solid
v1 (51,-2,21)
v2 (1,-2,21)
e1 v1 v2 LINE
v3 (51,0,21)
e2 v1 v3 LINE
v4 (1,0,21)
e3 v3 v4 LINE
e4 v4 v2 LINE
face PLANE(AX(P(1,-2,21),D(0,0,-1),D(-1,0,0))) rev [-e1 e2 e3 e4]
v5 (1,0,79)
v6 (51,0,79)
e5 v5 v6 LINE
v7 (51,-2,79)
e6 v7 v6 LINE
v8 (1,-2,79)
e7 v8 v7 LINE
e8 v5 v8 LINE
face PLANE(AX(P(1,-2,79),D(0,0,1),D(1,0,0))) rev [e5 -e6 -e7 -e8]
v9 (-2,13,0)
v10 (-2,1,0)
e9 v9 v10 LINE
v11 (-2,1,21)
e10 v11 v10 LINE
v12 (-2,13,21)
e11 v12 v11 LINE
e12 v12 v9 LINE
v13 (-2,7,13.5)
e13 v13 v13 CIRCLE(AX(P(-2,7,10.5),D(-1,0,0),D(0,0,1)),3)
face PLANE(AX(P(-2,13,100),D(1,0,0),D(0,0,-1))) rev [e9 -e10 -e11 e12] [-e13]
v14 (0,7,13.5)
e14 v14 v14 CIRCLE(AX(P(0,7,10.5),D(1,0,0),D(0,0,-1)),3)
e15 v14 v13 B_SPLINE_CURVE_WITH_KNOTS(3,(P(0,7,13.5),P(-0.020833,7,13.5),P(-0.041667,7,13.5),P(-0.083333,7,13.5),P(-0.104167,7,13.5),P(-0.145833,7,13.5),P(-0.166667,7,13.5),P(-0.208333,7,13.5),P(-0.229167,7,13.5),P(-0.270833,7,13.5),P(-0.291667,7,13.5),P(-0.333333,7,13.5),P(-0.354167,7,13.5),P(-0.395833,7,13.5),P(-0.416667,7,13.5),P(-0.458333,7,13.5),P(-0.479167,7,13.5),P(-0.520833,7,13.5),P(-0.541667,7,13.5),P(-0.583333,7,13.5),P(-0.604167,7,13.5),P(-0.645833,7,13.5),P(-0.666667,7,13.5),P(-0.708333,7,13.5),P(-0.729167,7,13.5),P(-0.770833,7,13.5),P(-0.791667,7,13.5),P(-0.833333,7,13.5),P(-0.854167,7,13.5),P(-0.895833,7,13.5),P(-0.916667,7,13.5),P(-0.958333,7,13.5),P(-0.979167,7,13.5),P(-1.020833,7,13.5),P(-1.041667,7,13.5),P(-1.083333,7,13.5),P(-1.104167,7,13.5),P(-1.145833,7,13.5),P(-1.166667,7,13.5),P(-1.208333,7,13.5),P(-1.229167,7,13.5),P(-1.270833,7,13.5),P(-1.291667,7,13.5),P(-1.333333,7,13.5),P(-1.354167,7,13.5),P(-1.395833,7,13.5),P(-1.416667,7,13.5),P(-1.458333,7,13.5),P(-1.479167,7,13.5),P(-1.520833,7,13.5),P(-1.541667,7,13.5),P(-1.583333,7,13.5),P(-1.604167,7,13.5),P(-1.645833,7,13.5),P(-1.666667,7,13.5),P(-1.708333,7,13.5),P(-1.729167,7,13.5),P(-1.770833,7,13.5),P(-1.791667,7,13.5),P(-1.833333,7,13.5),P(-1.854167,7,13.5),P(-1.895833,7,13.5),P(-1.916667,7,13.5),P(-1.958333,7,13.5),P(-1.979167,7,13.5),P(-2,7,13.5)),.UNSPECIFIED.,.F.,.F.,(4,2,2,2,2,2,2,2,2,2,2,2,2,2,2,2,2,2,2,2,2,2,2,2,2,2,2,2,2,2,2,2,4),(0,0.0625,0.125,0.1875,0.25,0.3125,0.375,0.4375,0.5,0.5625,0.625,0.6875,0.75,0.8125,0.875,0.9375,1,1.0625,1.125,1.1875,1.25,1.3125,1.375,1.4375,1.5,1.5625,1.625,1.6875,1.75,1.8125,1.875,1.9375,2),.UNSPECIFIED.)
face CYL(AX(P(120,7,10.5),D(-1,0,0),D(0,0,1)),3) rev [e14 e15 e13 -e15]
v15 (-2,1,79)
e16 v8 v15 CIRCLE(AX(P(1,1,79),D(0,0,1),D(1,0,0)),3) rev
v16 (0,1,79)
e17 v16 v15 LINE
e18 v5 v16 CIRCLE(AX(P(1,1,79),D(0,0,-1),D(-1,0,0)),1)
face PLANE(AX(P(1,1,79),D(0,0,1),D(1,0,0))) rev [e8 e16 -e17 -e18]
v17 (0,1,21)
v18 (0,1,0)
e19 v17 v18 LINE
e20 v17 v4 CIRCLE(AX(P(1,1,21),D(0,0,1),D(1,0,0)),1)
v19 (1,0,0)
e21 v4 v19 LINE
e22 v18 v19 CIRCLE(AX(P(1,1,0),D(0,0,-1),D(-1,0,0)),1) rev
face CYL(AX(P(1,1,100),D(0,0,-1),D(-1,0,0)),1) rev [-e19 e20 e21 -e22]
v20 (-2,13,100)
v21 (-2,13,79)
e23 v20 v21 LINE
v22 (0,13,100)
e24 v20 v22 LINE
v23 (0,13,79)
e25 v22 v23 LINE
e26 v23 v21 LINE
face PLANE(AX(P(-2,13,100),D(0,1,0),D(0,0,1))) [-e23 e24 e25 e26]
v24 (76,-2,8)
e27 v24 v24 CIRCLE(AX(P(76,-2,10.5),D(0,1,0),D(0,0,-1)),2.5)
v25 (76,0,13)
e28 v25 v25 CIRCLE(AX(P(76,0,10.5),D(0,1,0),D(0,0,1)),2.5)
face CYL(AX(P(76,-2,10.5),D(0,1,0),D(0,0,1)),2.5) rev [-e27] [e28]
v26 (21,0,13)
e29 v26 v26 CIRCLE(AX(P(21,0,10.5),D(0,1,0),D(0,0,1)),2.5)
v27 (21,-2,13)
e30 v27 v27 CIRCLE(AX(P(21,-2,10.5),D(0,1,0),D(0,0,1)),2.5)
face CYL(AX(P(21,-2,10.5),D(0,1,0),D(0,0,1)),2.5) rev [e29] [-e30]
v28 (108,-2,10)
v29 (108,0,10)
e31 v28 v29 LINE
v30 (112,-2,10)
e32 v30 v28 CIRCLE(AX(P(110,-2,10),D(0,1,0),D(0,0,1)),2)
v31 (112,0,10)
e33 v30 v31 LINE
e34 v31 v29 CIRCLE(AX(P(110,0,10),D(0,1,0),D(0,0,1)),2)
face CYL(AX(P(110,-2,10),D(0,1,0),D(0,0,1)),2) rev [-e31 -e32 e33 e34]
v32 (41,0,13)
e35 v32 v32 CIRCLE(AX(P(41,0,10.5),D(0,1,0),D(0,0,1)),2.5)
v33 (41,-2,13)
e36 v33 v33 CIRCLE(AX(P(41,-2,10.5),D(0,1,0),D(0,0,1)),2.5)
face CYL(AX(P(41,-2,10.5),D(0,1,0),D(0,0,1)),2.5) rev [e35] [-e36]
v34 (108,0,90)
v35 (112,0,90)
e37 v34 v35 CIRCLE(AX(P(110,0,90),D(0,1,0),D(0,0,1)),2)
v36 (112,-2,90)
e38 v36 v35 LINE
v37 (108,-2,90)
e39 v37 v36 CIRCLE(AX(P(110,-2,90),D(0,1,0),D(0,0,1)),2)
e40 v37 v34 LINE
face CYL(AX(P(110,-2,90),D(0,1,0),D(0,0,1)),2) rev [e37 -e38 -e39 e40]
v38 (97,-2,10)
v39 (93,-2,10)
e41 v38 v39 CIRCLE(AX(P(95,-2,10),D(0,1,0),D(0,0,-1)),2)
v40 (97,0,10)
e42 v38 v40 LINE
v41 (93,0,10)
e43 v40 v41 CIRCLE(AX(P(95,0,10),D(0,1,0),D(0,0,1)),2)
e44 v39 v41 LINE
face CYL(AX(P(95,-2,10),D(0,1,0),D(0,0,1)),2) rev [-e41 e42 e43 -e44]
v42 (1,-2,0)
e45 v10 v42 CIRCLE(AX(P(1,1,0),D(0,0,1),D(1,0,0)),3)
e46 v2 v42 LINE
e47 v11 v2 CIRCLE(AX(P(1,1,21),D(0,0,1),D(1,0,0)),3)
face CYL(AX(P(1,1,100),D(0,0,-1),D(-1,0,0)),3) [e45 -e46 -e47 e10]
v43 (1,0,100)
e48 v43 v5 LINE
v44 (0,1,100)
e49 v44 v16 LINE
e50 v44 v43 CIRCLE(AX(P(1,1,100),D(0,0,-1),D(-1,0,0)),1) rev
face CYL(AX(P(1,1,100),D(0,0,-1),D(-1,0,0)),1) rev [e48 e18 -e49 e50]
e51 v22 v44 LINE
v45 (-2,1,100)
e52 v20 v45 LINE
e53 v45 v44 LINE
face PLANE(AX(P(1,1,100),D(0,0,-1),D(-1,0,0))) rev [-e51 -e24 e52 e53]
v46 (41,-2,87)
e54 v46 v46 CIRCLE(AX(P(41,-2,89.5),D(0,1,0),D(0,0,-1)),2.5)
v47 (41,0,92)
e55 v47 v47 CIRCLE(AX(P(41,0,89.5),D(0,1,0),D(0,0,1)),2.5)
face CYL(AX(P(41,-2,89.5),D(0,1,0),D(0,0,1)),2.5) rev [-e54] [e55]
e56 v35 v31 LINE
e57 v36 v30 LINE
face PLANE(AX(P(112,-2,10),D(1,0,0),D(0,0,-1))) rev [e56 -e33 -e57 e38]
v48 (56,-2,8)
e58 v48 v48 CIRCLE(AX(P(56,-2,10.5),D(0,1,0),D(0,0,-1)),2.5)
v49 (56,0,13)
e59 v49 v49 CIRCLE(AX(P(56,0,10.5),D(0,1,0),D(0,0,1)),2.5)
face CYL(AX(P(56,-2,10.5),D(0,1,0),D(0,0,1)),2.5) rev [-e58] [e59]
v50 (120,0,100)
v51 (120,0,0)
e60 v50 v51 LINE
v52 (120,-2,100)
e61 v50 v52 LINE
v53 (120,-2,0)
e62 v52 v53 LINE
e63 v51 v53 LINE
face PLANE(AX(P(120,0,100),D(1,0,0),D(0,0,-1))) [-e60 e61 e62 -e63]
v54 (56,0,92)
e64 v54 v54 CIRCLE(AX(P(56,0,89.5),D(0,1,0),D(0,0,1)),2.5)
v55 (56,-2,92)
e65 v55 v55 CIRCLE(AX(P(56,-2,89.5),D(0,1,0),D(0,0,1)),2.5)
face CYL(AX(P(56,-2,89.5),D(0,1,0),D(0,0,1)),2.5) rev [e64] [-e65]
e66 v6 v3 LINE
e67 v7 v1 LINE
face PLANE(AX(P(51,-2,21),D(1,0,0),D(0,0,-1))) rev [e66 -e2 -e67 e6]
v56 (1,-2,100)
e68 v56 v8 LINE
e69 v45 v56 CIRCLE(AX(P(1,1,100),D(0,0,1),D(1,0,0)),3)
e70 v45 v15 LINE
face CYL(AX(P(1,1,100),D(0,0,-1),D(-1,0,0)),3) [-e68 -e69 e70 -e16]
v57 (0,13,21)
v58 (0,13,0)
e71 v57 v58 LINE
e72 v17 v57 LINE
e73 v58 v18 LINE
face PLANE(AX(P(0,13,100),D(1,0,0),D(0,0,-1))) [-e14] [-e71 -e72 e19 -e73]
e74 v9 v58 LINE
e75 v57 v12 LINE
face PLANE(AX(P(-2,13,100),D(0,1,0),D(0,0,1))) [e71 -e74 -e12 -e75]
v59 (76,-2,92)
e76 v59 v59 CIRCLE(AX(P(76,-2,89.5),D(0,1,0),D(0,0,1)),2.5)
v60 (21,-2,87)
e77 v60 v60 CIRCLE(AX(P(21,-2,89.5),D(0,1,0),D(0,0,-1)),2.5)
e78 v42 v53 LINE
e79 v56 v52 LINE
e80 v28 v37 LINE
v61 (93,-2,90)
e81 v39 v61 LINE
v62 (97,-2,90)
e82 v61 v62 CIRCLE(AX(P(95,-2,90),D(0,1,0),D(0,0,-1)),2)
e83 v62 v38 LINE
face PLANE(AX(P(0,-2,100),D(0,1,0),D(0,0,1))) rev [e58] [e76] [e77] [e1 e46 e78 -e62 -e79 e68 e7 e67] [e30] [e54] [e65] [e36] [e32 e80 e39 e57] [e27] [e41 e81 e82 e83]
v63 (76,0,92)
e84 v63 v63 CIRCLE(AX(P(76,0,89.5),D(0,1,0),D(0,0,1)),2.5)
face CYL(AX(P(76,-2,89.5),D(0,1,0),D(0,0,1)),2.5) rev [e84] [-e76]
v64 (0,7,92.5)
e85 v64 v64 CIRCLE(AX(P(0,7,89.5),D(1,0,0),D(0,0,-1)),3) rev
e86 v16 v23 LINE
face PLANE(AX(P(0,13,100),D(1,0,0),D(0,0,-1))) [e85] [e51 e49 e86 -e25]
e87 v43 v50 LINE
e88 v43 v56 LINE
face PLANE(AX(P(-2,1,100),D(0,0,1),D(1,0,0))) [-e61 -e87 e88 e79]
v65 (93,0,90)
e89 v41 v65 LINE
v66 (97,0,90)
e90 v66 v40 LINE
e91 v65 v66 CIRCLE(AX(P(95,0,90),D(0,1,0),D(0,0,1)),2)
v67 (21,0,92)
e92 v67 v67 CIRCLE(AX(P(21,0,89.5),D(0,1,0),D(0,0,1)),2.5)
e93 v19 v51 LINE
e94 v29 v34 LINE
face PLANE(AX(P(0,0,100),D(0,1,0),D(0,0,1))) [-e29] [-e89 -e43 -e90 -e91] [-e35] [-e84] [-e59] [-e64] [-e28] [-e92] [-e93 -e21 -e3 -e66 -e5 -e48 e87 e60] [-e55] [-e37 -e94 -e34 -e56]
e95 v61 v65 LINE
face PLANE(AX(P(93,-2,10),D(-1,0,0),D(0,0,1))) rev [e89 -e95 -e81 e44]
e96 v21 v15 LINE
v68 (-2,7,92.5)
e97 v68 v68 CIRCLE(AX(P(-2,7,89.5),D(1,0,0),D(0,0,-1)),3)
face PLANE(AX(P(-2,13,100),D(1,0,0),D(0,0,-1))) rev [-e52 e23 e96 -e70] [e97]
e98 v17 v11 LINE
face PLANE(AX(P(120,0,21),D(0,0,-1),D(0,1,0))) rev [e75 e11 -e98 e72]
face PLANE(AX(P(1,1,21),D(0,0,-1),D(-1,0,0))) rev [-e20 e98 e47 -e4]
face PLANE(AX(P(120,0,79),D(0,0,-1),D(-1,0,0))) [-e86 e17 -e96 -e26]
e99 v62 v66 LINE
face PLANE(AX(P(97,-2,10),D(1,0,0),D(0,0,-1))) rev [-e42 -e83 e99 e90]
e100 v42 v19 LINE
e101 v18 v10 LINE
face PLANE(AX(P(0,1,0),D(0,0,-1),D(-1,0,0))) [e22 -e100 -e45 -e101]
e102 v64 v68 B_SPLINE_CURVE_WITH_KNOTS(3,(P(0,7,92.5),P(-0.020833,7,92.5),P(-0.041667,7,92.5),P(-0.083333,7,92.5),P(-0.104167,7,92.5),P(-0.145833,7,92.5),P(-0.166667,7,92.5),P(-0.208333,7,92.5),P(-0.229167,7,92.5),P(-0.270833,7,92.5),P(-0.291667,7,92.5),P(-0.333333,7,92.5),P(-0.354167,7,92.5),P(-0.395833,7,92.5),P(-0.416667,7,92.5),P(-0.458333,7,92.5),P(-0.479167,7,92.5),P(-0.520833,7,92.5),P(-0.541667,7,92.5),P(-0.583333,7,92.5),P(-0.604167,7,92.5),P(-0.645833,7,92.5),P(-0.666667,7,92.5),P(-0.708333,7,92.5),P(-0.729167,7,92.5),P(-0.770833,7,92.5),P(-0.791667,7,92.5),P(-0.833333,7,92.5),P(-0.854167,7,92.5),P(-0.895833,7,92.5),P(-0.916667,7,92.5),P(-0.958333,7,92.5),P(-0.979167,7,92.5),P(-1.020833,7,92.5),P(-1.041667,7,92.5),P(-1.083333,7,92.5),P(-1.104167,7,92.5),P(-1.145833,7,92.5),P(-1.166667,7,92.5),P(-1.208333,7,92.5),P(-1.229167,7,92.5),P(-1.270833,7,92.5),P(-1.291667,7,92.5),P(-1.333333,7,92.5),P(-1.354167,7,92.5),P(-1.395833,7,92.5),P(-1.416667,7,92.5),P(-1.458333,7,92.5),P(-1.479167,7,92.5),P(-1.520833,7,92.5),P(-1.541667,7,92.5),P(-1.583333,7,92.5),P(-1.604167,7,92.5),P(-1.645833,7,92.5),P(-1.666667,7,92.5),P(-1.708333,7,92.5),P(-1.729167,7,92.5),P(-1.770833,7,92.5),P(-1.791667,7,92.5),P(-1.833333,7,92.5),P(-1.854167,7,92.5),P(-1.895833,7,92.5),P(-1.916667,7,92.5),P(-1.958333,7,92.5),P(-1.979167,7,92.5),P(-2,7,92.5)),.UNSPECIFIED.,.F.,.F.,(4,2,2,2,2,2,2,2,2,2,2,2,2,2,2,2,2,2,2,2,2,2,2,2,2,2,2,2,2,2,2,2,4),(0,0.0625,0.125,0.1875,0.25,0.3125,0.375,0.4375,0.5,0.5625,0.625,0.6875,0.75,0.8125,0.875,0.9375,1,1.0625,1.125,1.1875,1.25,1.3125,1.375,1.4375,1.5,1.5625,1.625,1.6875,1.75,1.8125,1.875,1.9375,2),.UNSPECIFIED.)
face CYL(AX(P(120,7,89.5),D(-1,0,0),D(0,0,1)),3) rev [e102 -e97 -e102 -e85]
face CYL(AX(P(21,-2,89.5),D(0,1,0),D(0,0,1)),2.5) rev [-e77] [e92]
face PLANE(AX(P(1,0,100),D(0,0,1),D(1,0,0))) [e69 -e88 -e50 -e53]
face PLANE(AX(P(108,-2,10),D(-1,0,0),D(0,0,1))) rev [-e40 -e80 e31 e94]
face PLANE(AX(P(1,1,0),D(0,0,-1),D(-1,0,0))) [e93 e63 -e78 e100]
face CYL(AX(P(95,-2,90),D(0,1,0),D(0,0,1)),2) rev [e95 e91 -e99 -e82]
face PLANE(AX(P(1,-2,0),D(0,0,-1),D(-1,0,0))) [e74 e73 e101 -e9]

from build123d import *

# Parameters (mm, degrees)
BASE_FLANGE1_DEPTH      = 100
SKETCH8_W               = 29
SKETCH8_H               = 12
SKETCH8_R               = 3
CUT_EXTRUDE1_DEPTH      = 159.28139499
CUT_EXTRUDE2_DEPTH      = 157.74501587
CUT_EXTRUDE2_DEPTH_BACK = 157.74501587
CUT_EXTRUDE4_START      = -2
CUT_EXTRUDE4_OUTLINE_W  = 3
CUT_EXTRUDE4_OUTLINE_H  = 58
CUT_EXTRUDE4_DEPTH      = 3
CUT_EXTRUDE5_DEPTH      = 157.74501587
CUT_EXTRUDE5_DEPTH_BACK = 157.74501587
SKETCH11_W              = 50
SKETCH11_H              = 58
CUT_EXTRUDE6_DEPTH      = 157.74501587
CUT_EXTRUDE6_DEPTH_BACK = 157.74501587
SKETCH12_R              = 2.5


# Read off the part's stored shape, not the designer's step: Cut-Extrude4
# Sheet-metal steps are written as plain solids
with BuildPart() as part:
    # Sketch1 → Base-Flange1 (new body)
    with BuildSketch(Plane.XY):
        with BuildLine():
            Line((0, 13), (0, 1))
            ThreePointArc((0, 1), (0.292893219, 0.292893219), (1, 0))
            Line((1, 0), (120, 0))
            Line((120, 0), (120, -2))
            Line((120, -2), (1, -2))
            ThreePointArc((1, -2), (-1.121320344, -1.121320344), (-2, 1))
            Line((-2, 1), (-2, 13))
            Line((-2, 13), (0, 13))
        make_face()
    extrude(amount=BASE_FLANGE1_DEPTH)

    # Sketch8 → Cut-Extrude1 (cut, through all)
    with BuildSketch(Plane.ZY.offset(2)):
        with Locations((35.5, 7)):
            Rectangle(SKETCH8_W, SKETCH8_H)
        with Locations((64.5, 7)):
            Rectangle(SKETCH8_W, SKETCH8_H)
        with Locations((10.5, 7)):
            Circle(SKETCH8_R)
        with Locations((89.5, 7)):
            Circle(SKETCH8_R)
    extrude(amount=-CUT_EXTRUDE1_DEPTH, mode=Mode.SUBTRACT)

    # Sketch9 → Cut-Extrude2 (cut, two sides: drawn at the far end of the back side and taken through both)
    with BuildSketch(Plane(origin=(0, 0, 0), x_dir=(1, 0, 0), z_dir=(0, 1, 0)).offset(-CUT_EXTRUDE2_DEPTH_BACK)):
        with BuildLine():
            Line((112, -10), (112, -90))
            ThreePointArc((112, -90), (110, -92), (108, -90))
            Line((108, -90), (108, -10))
            ThreePointArc((108, -10), (110, -8), (112, -10))
        make_face()
        with BuildLine():
            Line((93, -10), (93, -90))
            ThreePointArc((93, -90), (95, -92), (97, -90))
            Line((97, -90), (97, -10))
            ThreePointArc((97, -10), (95, -8), (93, -10))
        make_face()
    extrude(amount=CUT_EXTRUDE2_DEPTH + CUT_EXTRUDE2_DEPTH_BACK, mode=Mode.SUBTRACT)

    # Cut-Extrude4 outline → Cut-Extrude4 (cut)
    with BuildSketch(Plane(origin=(0, 0, 0), x_dir=(1, 0, 0), z_dir=(0, 1, 0)).offset(CUT_EXTRUDE4_START)):
        with Locations((-0.5, -50)):
            Rectangle(CUT_EXTRUDE4_OUTLINE_W, CUT_EXTRUDE4_OUTLINE_H)
    extrude(amount=CUT_EXTRUDE4_DEPTH, mode=Mode.SUBTRACT)

    # Sketch11 → Cut-Extrude5 (cut, two sides: drawn at the far end of the back side and taken through both)
    with BuildSketch(Plane(origin=(0, 0, 0), x_dir=(1, 0, 0), z_dir=(0, 1, 0)).offset(-CUT_EXTRUDE5_DEPTH_BACK)):
        with Locations((26, -50)):
            Rectangle(SKETCH11_W, SKETCH11_H)
    extrude(amount=CUT_EXTRUDE5_DEPTH + CUT_EXTRUDE5_DEPTH_BACK, mode=Mode.SUBTRACT)

    # Sketch12 → Cut-Extrude6 (cut, two sides: drawn at the far end of the back side and taken through both)
    with BuildSketch(Plane(origin=(0, 0, 0), x_dir=(1, 0, 0), z_dir=(0, 1, 0)).offset(-CUT_EXTRUDE6_DEPTH_BACK)):
        with Locations(Location((21, -10.5, 0), (0, 0, 270))):
            Circle(SKETCH12_R)
        with Locations(Location((41, -10.5, 0), (0, 0, 270))):
            Circle(SKETCH12_R)
        with Locations(Location((21, -89.5, 0), (0, 0, 270))):
            Circle(SKETCH12_R)
        with Locations(Location((41, -89.5, 0), (0, 0, 270))):
            Circle(SKETCH12_R)
        with Locations(Location((76, -89.5, 0), (0, 0, 270))):
            Circle(SKETCH12_R)
        with Locations(Location((56, -89.5, 0), (0, 0, 270))):
            Circle(SKETCH12_R)
        with Locations(Location((56, -10.5, 0), (0, 0, 270))):
            Circle(SKETCH12_R)
        with Locations(Location((76, -10.5, 0), (0, 0, 270))):
            Circle(SKETCH12_R)
    extrude(amount=CUT_EXTRUDE6_DEPTH + CUT_EXTRUDE6_DEPTH_BACK, mode=Mode.SUBTRACT)


solid = part.part
